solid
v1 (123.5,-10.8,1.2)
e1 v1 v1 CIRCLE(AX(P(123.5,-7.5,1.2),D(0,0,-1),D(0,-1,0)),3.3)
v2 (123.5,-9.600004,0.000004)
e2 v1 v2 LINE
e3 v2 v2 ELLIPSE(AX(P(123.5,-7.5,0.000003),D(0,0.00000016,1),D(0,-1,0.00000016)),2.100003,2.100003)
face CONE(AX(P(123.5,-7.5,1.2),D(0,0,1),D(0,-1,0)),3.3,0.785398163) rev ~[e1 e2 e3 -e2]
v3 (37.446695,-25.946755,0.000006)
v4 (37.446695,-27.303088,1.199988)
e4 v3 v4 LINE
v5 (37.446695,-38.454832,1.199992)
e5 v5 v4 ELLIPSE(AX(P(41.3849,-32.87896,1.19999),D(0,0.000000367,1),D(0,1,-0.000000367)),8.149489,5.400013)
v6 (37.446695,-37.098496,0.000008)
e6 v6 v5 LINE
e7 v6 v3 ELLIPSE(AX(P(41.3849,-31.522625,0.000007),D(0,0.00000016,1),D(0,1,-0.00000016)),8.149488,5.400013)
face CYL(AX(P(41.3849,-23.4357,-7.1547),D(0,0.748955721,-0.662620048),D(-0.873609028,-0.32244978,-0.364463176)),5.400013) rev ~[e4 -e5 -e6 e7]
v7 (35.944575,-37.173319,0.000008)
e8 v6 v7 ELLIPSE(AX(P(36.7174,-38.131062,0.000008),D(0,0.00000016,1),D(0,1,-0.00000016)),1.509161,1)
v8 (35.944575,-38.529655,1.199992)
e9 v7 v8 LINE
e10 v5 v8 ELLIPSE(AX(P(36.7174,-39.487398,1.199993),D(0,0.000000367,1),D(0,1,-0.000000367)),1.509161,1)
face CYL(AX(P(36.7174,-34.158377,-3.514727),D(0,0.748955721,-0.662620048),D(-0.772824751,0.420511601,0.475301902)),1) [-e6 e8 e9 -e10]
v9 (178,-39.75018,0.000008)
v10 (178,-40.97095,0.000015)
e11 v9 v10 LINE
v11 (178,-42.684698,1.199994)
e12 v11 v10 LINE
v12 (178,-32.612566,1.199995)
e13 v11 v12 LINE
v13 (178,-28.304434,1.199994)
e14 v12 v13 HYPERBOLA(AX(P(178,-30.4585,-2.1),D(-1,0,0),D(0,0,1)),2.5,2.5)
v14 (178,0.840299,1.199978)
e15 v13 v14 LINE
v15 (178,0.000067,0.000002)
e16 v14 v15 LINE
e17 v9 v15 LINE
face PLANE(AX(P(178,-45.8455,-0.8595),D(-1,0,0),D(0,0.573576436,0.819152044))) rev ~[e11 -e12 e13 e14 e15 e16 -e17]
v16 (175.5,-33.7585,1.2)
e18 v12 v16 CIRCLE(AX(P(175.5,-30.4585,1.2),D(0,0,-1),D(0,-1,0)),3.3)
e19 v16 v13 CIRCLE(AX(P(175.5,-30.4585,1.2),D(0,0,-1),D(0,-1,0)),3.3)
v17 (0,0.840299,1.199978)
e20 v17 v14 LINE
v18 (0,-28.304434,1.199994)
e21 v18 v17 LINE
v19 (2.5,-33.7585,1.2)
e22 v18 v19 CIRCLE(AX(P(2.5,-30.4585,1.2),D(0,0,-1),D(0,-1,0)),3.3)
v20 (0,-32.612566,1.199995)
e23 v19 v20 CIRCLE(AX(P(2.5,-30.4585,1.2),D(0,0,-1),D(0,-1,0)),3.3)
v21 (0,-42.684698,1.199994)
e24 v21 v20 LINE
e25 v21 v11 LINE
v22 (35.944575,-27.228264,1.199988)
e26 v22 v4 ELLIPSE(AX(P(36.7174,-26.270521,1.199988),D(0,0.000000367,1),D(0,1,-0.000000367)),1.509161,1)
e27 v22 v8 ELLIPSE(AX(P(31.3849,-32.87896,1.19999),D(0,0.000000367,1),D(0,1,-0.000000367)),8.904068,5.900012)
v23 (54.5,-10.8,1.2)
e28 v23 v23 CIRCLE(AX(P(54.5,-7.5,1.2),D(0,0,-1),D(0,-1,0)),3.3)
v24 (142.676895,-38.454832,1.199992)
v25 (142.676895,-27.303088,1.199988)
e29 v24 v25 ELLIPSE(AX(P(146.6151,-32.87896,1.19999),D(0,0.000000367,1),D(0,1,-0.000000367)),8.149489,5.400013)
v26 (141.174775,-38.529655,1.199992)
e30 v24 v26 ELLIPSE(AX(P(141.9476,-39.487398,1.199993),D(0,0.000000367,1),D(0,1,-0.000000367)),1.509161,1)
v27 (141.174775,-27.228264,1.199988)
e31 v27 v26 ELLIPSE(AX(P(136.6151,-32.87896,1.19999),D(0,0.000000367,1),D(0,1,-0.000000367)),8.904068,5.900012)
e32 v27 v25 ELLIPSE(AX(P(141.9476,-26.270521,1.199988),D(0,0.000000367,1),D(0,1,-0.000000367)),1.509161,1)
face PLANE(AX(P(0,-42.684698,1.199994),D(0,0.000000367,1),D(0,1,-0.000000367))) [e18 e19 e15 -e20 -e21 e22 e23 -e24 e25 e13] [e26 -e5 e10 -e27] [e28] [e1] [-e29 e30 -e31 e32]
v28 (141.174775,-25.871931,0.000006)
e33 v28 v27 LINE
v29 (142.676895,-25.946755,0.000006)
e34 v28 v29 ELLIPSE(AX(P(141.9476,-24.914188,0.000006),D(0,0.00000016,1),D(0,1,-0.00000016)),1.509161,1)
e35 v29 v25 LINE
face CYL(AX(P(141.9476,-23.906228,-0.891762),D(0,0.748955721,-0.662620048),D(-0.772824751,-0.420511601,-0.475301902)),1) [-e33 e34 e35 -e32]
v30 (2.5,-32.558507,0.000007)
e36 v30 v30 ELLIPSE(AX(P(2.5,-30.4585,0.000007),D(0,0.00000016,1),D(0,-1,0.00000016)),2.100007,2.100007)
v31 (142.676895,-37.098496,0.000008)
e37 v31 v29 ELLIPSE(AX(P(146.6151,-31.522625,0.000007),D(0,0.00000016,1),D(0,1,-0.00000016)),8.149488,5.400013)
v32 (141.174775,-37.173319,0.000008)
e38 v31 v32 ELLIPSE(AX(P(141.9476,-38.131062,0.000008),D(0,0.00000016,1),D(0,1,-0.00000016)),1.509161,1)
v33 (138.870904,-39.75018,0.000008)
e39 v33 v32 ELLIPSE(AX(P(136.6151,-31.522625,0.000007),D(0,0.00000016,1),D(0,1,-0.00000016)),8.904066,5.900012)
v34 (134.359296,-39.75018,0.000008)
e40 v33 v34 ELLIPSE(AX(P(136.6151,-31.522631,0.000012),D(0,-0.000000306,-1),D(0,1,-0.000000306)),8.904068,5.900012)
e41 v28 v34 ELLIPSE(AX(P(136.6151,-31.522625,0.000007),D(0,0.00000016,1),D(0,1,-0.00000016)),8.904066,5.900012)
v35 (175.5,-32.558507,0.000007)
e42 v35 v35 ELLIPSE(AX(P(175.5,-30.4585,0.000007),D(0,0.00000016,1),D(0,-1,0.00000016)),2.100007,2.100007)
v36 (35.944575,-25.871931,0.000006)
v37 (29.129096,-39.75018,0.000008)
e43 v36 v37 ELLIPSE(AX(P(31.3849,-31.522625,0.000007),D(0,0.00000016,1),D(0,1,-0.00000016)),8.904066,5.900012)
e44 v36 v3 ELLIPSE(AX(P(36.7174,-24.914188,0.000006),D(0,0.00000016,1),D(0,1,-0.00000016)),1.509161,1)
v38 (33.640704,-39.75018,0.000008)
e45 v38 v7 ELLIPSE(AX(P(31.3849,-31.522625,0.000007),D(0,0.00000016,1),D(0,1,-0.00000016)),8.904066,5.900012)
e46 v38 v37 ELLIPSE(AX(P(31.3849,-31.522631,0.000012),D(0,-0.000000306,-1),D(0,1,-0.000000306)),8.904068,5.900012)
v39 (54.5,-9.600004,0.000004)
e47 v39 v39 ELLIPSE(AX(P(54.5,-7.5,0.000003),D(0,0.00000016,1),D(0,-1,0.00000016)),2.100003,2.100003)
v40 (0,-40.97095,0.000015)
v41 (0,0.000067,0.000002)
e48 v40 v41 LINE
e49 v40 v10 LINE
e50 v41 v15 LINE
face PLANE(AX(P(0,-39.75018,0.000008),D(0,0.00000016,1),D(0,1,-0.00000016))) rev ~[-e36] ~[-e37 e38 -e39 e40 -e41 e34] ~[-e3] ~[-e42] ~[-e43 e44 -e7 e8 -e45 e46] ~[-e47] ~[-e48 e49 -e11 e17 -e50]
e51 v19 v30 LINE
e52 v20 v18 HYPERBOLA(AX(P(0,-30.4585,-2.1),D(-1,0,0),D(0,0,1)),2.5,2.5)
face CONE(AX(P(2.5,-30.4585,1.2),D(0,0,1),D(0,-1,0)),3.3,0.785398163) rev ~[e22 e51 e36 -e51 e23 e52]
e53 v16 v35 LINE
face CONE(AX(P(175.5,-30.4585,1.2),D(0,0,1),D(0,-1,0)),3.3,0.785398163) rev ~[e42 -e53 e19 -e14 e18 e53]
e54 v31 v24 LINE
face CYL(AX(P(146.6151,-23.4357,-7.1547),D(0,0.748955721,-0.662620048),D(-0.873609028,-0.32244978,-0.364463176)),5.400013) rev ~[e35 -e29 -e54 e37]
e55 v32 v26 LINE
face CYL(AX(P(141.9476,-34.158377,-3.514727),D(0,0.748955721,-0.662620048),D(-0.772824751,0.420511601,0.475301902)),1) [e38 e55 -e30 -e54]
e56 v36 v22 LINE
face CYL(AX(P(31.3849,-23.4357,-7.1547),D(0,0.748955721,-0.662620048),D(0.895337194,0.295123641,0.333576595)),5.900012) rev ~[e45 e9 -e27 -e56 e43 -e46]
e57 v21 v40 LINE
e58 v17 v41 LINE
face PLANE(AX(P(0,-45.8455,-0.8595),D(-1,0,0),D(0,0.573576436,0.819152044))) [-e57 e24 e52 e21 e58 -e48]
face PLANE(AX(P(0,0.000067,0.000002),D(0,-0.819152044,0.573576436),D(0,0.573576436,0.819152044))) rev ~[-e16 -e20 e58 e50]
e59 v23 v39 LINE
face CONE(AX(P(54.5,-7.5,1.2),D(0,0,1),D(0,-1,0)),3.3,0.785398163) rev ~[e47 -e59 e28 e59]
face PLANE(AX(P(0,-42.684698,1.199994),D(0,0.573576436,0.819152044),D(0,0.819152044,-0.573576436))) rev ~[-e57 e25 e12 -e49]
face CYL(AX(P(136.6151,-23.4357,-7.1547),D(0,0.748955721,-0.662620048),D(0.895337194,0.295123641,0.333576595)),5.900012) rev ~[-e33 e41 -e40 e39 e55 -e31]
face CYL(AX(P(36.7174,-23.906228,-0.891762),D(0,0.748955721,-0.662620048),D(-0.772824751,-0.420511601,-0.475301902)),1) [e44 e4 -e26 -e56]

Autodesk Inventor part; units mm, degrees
ref_plane "YZ Plane" through (0, 0, 0) normal (1, 0, 0) x (0, 1, 0)
ref_plane "XZ Plane" through (0, 0, 0) normal (0, 1, 0) x (-1, 0, 0)
ref_plane "Work Plane1" through (0, -45.8455, -0.8595) normal (-1, 0, 0) x (0, 0.5735764, 0.819152)
sketch "Sketch1" plane through (0, -45.8455, -0.8595) normal (-1, 0, 0) x (0, 0.5735764, 0.819152)
  line L0 (4.2002, 4.5) -> (27, 37.0615) projected
  line L1 (3.5, -0.5) -> (3.5, 3.5) projected
  line L2 (27, 37.0615) -> (28, 37.0615) projected
  line L3 (27, 37.0615) -> (3.5, 3.5)
  line L4 (3.5, 1.4079) -> (28.4649, 37.0615)
  line L5 (27, 37.0615) -> (28.4649, 37.0615)
  point P0 (4.2002, 4.5)
  dimension "d0" = 1.2
  dimension "d1" = 55
ref_plane "Work Plane2" through (178, -42.7329, -77.104) normal (1, 0, 0) x (0, 0.819152, -0.5735764)
extrude "Extrusion1" add sketch "Sketch1" against normal up to surface (178 mm away)
ref_plane "Work Plane3" through (36.3849, -23.4357, -7.1547) normal (0, -0.7489557, 0.66262) x (1, 0, 0)
ref_plane "Work Plane4" through (36.3849, -23.4357, -7.1547) normal (0, -0.7489557, 0.66262) x (1, 0, 0)
sketch "Sketch4" plane through (36.3849, -23.4357, -7.1547) normal (0, -0.7489557, 0.66262) x (1, 0, 0)
  line L0 (-14.9215, 5.4518) -> (-14.9215, -5.4534)
  spline S0 degree 3 poles (-14.9215, -5.4534) (-14.9222, -5.5772) (-14.8715, -5.6989) (-14.7851, -5.7853) (-14.7653, -5.8051) (-14.7437, -5.823) (-14.7206, -5.8388) (-14.7012, -5.8521) (-14.6808, -5.864) (-14.6595, -5.8743) (-14.6436, -5.882) (-14.6272, -5.8889) (-14.6105, -5.8948) (-14.5603, -5.9125) (-14.5071, -5.9218) (-14.4534, -5.9215) knots 0 0 0 0 0.5 0.5 0.5 0.614375 0.614375 0.614375 0.710781 0.710781 0.710781 0.783086 0.783086 0.783086 1 1 1 1
  line L1 (-14.4534, -5.9215) -> (14.4534, -5.9215)
  spline S1 degree 3 poles (14.4534, -5.9215) (14.5775, -5.9222) (14.6994, -5.8713) (14.8723, -5.6977) (14.9222, -5.5758) (14.9215, -5.4518) knots 0 0 0 0 0.5 0.5 1 1 1 1
  line L2 (14.9215, -5.4518) -> (14.9215, 5.4534)
  spline S2 degree 3 poles (14.9215, 5.4534) (14.9222, 5.5775) (14.8713, 5.6994) (14.6977, 5.8723) (14.5758, 5.9222) (14.4518, 5.9215) knots 0 0 0 0 0.5 0.5 1 1 1 1
  line L3 (14.4518, 5.9215) -> (-14.4534, 5.9215)
  spline S3 degree 3 poles (-14.4534, 5.9215) (-14.5775, 5.9222) (-14.6994, 5.8713) (-14.8723, 5.6977) (-14.9222, 5.5758) (-14.9215, 5.4518) knots 0 0 0 0 0.5 0.5 1 1 1 1
  circle A0 centre (-13.3791, -4.3791) radius 0.5
  circle A1 centre (-13.3791, 4.3791) radius 0.5
  circle A2 centre (13.3791, 4.3791) radius 0.5
  circle A3 centre (13.3791, -4.3791) radius 0.5
  arc A4 (0.2617, -1.4512) -> (0.1811, -1.5218) centre (0.2771, -1.55) ccw
  arc A5 (0.1811, 1.5218) -> (0.1811, -1.5218) centre (-5, 0) ccw
  arc A6 (0.1811, 1.5218) -> (0.2617, 1.4512) centre (0.2771, 1.55) ccw
  arc A7 (0.2617, 1.4512) -> (0.3414, 1.519) centre (0.2463, 1.55) ccw
  arc A8 (0.3414, -1.519) -> (0.3414, 1.519) centre (5, 0) ccw
  arc A9 (0.3414, -1.519) -> (0.2617, -1.4512) centre (0.2463, -1.55) ccw
  line L4 (90.3087, 5.4518) -> (90.3087, -5.4534)
  spline S4 degree 3 poles (90.3087, -5.4534) (90.308, -5.5772) (90.3587, -5.6989) (90.4451, -5.7853) (90.4649, -5.8051) (90.4865, -5.823) (90.5096, -5.8388) (90.529, -5.8521) (90.5494, -5.864) (90.5707, -5.8743) (90.5866, -5.882) (90.603, -5.8889) (90.6197, -5.8948) (90.6699, -5.9125) (90.7231, -5.9218) (90.7769, -5.9215) knots 0 0 0 0 0.5 0.5 0.5 0.614375 0.614375 0.614375 0.710781 0.710781 0.710781 0.783086 0.783086 0.783086 1 1 1 1
  line L5 (90.7769, -5.9215) -> (119.6836, -5.9215)
  spline S5 degree 3 poles (119.6836, -5.9215) (119.8077, -5.9222) (119.9296, -5.8713) (120.1025, -5.6977) (120.1524, -5.5758) (120.1517, -5.4518) knots 0 0 0 0 0.5 0.5 1 1 1 1
  line L6 (120.1517, -5.4518) -> (120.1517, 5.4534)
  spline S6 degree 3 poles (120.1517, 5.4534) (120.1524, 5.5775) (120.1015, 5.6994) (119.9279, 5.8723) (119.806, 5.9222) (119.682, 5.9215) knots 0 0 0 0 0.5 0.5 1 1 1 1
  line L7 (119.682, 5.9215) -> (90.7769, 5.9215)
  spline S7 degree 3 poles (90.7769, 5.9215) (90.6527, 5.9222) (90.5308, 5.8713) (90.3579, 5.6977) (90.308, 5.5758) (90.3087, 5.4518) knots 0 0 0 0 0.5 0.5 1 1 1 1
  circle A10 centre (91.8511, -4.3791) radius 0.5
  circle A11 centre (91.8511, 4.3791) radius 0.5
  circle A12 centre (118.6093, 4.3791) radius 0.5
  circle A13 centre (118.6093, -4.3791) radius 0.5
  arc A14 (105.4919, -1.4512) -> (105.4113, -1.5218) centre (105.5073, -1.55) ccw
  arc A15 (105.4113, 1.5218) -> (105.4113, -1.5218) centre (100.2302, 0) ccw
  arc A16 (105.4113, 1.5218) -> (105.4919, 1.4512) centre (105.5073, 1.55) ccw
  arc A17 (105.4919, 1.4512) -> (105.5716, 1.519) centre (105.4765, 1.55) ccw
  arc A18 (105.5716, -1.519) -> (105.5716, 1.519) centre (110.2302, 0) ccw
  arc A19 (105.5716, -1.519) -> (105.4919, -1.4512) centre (105.4765, -1.55) ccw
  arc A20 (105.5127, 2.6278) -> (105.5127, -2.6278) centre (100.2302, 0) ccw
  arc A21 (105.5127, -2.6278) -> (105.5127, 2.6278) centre (110.2302, 0) ccw
  arc A22 (0.2825, 2.6278) -> (0.2825, -2.6278) centre (-5, 0) ccw
  arc A23 (0.2825, -2.6278) -> (0.2825, 2.6278) centre (5, 0) ccw
  point P0 (-36.3849, 20.8875)
  dimension "d27" = 0.5
  dimension "d28" = 0.5
extrude "Extrusion2" cut sketch "Sketch4" along normal up to next contours A4 A5 A6 A7 A8 A9 | A14 A15 A16 A17 A18 A19 | A21 A20 | A23 A22
sketch "Sketch6" plane through (0, -42.6848, 1.2) normal (0, 0, 1) x (1, 0, 0)
  circle A0 centre (54.5, 35.1848) radius 2.3 projected
  circle A1 centre (123.5, 35.1848) radius 2.3 projected
  circle A2 centre (2.5, 12.2262) radius 2.3 projected
  circle A3 centre (175.5, 12.2262) radius 2.3 projected
  point P0 (0, 42.6848)
hole "Hole1" at (54.5, -7.5, 1.2) at (123.5, -7.5, 1.2) at (2.5, -30.4585, 1.2) at (175.5, -30.4585, 1.2) direction (0, 0, -1) diameter 3.6 end through all countersink diameter 6.6 countersink angle 90 clearance for "Countersunk Flat Head Screw ISO 2009/7046" size "M3" standard "ISO"
fillet "Fillet1" radius 1 4 edges at (36.6674, -36.1666, 0.6) (36.6674, -28.2351, 0.6) (141.8976, -28.2351, 0.6) (141.8976, -36.1666, 0.6)
properties part number "front" material "Nylon 6/6"
